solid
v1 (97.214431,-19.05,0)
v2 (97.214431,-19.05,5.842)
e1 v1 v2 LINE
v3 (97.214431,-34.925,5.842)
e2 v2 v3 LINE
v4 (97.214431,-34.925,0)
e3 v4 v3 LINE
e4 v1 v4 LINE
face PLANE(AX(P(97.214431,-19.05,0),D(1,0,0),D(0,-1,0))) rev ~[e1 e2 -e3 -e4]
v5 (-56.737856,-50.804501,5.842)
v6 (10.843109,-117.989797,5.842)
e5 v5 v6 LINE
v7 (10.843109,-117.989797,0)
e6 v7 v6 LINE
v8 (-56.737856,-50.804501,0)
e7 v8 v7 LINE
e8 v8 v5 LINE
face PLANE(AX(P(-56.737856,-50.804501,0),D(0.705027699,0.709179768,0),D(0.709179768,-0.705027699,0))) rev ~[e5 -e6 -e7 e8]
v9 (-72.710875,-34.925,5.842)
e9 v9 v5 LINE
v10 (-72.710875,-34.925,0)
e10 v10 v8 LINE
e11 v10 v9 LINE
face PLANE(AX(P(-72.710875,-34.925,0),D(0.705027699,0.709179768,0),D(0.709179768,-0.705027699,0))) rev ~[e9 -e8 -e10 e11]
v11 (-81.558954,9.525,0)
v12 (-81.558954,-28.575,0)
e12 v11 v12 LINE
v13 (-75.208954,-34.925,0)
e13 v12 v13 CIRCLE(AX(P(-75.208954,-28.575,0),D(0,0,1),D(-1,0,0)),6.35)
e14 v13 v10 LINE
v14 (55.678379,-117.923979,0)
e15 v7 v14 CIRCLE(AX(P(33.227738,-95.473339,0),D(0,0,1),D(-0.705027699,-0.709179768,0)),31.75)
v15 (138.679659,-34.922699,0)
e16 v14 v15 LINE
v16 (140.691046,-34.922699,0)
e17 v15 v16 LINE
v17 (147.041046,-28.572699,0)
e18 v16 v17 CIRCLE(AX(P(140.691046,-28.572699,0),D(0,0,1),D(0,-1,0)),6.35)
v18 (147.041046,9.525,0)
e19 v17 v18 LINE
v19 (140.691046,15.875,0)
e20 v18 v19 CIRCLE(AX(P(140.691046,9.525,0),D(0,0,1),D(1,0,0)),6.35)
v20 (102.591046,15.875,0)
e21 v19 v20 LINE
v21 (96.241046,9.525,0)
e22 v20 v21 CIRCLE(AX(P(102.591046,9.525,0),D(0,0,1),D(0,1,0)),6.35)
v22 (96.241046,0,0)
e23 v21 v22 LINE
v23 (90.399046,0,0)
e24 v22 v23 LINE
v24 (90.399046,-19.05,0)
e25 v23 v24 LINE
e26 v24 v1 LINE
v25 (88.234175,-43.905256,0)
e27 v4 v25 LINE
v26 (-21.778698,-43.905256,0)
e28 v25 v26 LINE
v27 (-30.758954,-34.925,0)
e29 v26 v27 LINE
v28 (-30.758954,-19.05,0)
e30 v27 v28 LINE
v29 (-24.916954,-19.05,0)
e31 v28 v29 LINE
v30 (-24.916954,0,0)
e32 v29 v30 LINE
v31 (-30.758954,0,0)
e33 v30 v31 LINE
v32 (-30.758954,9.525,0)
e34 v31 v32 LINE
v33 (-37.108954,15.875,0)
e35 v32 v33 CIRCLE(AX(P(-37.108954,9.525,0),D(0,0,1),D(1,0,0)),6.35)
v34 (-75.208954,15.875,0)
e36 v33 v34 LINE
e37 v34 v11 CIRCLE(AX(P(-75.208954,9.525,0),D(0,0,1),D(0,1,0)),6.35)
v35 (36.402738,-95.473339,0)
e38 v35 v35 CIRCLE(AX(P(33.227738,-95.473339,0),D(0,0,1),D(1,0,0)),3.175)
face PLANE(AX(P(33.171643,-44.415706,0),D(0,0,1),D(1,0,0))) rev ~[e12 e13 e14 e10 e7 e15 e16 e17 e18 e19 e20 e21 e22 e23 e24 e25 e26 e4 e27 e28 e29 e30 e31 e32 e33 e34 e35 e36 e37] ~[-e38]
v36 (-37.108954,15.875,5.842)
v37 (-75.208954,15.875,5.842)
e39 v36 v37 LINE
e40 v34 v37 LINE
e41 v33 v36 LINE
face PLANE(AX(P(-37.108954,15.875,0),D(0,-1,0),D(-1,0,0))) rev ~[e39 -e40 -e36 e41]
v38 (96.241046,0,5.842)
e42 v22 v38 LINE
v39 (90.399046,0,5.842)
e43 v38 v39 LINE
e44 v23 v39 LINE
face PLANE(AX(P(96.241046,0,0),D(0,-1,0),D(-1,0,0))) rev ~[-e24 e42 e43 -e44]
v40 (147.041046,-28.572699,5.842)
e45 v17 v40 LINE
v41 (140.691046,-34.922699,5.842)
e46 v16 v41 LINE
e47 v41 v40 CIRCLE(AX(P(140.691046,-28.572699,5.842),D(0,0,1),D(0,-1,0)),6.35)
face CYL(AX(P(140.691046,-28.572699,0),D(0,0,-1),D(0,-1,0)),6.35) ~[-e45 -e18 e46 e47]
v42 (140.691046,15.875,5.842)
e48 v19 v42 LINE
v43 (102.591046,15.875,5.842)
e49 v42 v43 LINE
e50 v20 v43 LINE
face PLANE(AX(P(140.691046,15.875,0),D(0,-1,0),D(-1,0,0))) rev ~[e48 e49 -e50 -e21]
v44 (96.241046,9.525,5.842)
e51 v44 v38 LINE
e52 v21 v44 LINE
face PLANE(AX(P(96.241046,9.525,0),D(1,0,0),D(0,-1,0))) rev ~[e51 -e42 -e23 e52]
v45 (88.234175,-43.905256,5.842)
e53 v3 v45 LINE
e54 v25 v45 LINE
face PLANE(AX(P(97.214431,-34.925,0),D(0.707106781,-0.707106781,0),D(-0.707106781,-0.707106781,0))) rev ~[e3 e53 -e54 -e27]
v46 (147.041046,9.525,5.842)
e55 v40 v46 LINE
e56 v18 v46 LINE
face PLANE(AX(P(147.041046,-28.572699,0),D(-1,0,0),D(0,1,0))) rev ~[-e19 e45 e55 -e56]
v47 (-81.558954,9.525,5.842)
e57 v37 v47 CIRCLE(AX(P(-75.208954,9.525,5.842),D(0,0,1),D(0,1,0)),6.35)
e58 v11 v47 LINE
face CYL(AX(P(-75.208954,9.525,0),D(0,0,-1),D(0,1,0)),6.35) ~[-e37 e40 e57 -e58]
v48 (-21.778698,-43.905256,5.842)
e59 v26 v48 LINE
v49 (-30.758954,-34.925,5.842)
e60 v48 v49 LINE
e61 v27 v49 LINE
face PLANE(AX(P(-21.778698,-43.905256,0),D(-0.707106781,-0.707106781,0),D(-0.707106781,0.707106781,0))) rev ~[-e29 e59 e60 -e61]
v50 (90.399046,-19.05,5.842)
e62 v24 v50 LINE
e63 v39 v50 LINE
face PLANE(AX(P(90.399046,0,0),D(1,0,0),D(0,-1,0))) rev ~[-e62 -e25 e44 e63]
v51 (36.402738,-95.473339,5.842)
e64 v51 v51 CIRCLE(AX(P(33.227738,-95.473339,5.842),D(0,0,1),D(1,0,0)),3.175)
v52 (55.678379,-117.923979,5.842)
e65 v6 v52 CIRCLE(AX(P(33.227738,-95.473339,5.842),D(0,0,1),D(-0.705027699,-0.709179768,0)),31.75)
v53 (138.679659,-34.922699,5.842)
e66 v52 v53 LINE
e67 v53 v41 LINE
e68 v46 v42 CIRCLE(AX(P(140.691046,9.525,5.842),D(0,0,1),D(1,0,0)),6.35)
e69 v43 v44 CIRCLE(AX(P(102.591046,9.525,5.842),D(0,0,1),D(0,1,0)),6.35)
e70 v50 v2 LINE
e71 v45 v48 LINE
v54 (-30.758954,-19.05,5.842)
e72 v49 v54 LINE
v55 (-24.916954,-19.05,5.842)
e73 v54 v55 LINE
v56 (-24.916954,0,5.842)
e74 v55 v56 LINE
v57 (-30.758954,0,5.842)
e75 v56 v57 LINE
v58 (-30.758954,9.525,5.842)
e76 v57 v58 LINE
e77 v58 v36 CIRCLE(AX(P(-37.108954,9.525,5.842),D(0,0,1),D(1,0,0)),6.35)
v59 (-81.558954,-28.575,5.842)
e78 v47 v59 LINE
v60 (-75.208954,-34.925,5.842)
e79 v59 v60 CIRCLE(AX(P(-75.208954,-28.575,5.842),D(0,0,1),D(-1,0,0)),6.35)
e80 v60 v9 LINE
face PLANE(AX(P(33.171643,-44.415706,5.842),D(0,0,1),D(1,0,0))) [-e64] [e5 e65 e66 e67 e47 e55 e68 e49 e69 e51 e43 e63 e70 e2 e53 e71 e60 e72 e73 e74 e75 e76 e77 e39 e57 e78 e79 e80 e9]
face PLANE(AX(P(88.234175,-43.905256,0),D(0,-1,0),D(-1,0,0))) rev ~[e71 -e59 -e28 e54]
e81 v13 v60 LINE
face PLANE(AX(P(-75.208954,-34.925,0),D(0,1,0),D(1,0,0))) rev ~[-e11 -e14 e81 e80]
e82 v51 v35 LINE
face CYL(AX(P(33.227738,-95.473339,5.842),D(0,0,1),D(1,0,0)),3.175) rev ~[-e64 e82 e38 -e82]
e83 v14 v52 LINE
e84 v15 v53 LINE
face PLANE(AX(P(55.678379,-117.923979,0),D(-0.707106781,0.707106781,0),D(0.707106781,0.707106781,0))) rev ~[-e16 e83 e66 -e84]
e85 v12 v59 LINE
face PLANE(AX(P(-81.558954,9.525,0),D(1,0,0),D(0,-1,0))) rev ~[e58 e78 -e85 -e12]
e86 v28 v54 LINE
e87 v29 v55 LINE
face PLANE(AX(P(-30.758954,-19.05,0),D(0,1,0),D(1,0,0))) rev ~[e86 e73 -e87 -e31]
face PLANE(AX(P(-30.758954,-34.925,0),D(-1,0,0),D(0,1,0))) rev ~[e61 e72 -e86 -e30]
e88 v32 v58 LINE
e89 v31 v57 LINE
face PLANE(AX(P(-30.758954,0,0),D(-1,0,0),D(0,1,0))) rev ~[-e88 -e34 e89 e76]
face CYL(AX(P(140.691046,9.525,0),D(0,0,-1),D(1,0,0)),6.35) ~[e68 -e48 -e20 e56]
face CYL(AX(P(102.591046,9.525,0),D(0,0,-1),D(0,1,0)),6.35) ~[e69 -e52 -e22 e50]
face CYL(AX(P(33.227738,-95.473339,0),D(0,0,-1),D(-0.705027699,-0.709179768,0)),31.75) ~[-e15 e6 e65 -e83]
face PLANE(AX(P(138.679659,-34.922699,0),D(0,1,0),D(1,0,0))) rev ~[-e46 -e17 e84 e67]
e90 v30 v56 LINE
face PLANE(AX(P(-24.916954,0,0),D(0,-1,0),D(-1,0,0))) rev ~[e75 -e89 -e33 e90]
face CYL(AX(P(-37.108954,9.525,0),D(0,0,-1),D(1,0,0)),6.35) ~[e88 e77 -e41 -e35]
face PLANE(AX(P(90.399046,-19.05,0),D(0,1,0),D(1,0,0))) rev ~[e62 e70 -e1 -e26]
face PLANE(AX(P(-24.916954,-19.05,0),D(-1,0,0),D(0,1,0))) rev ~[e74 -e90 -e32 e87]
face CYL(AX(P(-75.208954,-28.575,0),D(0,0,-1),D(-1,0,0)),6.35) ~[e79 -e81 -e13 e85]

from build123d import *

# Parameters (mm, degrees)
F1_DEPTH = 5.842
F2_R     = 3.175
F3_DEPTH = 5.842


# Not quite as in the source:
# - a feature names something its author has since deleted; it is built from what else it names


with BuildPart() as f1:
    # F0 (on Top) → F1 (new body)
    with BuildSketch(Plane.XY):
        with BuildLine():
            Line((-37.108954253, 15.875), (-43.458954253, 15.875))
            Line((-43.458954253, 15.875), (-75.208954253, 15.875))
            ThreePointArc((-75.208954253, 15.875), (-79.6990823135, 14.0151280605), (-81.558954253, 9.525))
            Line((-81.558954253, 9.525), (-81.558954253, -28.575))
            ThreePointArc((-81.558954253, -28.575), (-79.6990823135, -33.0651280605), (-75.208954253, -34.925))
            Line((-75.208954253, -34.925), (-72.710875161, -34.925))
            Line((-72.710875161, -34.925), (-56.7378558105, -50.8045013442))
            Line((-56.7378558105, -50.8045013442), (10.8431089825, -117.9897966054))
            ThreePointArc((10.8431089825, -117.9897966054), (21.0344920397, -66.1580316621), (64.9777384297, -95.4733389685))
            ThreePointArc((64.9777384297, -95.4733389685), (62.5609135869, -107.6235379461), (55.6783787323, -117.9239792712))
            Line((55.6783787323, -117.9239792712), (110.9403548131, -62.6620031905))
            Line((110.9403548131, -62.6620031905), (138.6796593377, -34.9226986659))
            Line((138.6796593377, -34.9226986659), (140.691045747, -34.9226986659))
            ThreePointArc((140.691045747, -34.9226986659), (145.1811738076, -33.0628267264), (147.041045747, -28.5726986659))
            Line((147.041045747, -28.5726986659), (147.041045747, 9.525))
            ThreePointArc((147.041045747, 9.525), (145.1811738076, 14.0151280605), (140.691045747, 15.875))
            Line((140.691045747, 15.875), (108.941045747, 15.875))
            Line((108.941045747, 15.875), (102.591045747, 15.875))
            ThreePointArc((102.591045747, 15.875), (98.1009176865, 14.0151280605), (96.241045747, 9.525))
            Line((96.241045747, 9.525), (96.241045747, 0))
            Line((96.241045747, 0), (90.399045747, 0))
            Line((90.399045747, 0), (90.399045747, -19.05))
            Line((90.399045747, -19.05), (97.2144311123, -19.05))
            Line((97.2144311123, -19.05), (97.2144311123, -34.925))
            Line((97.2144311123, -34.925), (88.2341749912, -43.9052561211))
            Line((88.2341749912, -43.9052561211), (-21.7786981319, -43.9052561211))
            Line((-21.7786981319, -43.9052561211), (-30.758954253, -34.925))
            Line((-30.758954253, -34.925), (-30.758954253, -19.05))
            Line((-30.758954253, -19.05), (-24.916954253, -19.05))
            Line((-24.916954253, -19.05), (-24.916954253, 0))
            Line((-24.916954253, 0), (-30.758954253, 0))
            Line((-30.758954253, 0), (-30.758954253, 9.525))
            ThreePointArc((-30.758954253, 9.525), (-32.6188261924, 14.0151280605), (-37.108954253, 15.875))
        make_face()
        with BuildLine():
            ThreePointArc((64.9777384297, -95.4733389685), (21.0344920397, -66.1580316621), (10.8431089825, -117.9897966054))
            ThreePointArc((10.8431089825, -117.9897966054), (33.2743467834, -127.2233047585), (55.6783787323, -117.9239792712))
            ThreePointArc((55.6783787323, -117.9239792712), (62.5609135869, -107.6235379461), (64.9777384297, -95.4733389685))
        make_face()
    extrude(amount=F1_DEPTH)

    # F2 (on face) → F3 (cut, through all)
    with BuildSketch(Plane.XY.offset(5.842)):
        with Locations((33.2277384297, -95.4733389685)):
            Circle(F2_R)
    extrude(amount=-F3_DEPTH, mode=Mode.SUBTRACT)


solid = f1.part
